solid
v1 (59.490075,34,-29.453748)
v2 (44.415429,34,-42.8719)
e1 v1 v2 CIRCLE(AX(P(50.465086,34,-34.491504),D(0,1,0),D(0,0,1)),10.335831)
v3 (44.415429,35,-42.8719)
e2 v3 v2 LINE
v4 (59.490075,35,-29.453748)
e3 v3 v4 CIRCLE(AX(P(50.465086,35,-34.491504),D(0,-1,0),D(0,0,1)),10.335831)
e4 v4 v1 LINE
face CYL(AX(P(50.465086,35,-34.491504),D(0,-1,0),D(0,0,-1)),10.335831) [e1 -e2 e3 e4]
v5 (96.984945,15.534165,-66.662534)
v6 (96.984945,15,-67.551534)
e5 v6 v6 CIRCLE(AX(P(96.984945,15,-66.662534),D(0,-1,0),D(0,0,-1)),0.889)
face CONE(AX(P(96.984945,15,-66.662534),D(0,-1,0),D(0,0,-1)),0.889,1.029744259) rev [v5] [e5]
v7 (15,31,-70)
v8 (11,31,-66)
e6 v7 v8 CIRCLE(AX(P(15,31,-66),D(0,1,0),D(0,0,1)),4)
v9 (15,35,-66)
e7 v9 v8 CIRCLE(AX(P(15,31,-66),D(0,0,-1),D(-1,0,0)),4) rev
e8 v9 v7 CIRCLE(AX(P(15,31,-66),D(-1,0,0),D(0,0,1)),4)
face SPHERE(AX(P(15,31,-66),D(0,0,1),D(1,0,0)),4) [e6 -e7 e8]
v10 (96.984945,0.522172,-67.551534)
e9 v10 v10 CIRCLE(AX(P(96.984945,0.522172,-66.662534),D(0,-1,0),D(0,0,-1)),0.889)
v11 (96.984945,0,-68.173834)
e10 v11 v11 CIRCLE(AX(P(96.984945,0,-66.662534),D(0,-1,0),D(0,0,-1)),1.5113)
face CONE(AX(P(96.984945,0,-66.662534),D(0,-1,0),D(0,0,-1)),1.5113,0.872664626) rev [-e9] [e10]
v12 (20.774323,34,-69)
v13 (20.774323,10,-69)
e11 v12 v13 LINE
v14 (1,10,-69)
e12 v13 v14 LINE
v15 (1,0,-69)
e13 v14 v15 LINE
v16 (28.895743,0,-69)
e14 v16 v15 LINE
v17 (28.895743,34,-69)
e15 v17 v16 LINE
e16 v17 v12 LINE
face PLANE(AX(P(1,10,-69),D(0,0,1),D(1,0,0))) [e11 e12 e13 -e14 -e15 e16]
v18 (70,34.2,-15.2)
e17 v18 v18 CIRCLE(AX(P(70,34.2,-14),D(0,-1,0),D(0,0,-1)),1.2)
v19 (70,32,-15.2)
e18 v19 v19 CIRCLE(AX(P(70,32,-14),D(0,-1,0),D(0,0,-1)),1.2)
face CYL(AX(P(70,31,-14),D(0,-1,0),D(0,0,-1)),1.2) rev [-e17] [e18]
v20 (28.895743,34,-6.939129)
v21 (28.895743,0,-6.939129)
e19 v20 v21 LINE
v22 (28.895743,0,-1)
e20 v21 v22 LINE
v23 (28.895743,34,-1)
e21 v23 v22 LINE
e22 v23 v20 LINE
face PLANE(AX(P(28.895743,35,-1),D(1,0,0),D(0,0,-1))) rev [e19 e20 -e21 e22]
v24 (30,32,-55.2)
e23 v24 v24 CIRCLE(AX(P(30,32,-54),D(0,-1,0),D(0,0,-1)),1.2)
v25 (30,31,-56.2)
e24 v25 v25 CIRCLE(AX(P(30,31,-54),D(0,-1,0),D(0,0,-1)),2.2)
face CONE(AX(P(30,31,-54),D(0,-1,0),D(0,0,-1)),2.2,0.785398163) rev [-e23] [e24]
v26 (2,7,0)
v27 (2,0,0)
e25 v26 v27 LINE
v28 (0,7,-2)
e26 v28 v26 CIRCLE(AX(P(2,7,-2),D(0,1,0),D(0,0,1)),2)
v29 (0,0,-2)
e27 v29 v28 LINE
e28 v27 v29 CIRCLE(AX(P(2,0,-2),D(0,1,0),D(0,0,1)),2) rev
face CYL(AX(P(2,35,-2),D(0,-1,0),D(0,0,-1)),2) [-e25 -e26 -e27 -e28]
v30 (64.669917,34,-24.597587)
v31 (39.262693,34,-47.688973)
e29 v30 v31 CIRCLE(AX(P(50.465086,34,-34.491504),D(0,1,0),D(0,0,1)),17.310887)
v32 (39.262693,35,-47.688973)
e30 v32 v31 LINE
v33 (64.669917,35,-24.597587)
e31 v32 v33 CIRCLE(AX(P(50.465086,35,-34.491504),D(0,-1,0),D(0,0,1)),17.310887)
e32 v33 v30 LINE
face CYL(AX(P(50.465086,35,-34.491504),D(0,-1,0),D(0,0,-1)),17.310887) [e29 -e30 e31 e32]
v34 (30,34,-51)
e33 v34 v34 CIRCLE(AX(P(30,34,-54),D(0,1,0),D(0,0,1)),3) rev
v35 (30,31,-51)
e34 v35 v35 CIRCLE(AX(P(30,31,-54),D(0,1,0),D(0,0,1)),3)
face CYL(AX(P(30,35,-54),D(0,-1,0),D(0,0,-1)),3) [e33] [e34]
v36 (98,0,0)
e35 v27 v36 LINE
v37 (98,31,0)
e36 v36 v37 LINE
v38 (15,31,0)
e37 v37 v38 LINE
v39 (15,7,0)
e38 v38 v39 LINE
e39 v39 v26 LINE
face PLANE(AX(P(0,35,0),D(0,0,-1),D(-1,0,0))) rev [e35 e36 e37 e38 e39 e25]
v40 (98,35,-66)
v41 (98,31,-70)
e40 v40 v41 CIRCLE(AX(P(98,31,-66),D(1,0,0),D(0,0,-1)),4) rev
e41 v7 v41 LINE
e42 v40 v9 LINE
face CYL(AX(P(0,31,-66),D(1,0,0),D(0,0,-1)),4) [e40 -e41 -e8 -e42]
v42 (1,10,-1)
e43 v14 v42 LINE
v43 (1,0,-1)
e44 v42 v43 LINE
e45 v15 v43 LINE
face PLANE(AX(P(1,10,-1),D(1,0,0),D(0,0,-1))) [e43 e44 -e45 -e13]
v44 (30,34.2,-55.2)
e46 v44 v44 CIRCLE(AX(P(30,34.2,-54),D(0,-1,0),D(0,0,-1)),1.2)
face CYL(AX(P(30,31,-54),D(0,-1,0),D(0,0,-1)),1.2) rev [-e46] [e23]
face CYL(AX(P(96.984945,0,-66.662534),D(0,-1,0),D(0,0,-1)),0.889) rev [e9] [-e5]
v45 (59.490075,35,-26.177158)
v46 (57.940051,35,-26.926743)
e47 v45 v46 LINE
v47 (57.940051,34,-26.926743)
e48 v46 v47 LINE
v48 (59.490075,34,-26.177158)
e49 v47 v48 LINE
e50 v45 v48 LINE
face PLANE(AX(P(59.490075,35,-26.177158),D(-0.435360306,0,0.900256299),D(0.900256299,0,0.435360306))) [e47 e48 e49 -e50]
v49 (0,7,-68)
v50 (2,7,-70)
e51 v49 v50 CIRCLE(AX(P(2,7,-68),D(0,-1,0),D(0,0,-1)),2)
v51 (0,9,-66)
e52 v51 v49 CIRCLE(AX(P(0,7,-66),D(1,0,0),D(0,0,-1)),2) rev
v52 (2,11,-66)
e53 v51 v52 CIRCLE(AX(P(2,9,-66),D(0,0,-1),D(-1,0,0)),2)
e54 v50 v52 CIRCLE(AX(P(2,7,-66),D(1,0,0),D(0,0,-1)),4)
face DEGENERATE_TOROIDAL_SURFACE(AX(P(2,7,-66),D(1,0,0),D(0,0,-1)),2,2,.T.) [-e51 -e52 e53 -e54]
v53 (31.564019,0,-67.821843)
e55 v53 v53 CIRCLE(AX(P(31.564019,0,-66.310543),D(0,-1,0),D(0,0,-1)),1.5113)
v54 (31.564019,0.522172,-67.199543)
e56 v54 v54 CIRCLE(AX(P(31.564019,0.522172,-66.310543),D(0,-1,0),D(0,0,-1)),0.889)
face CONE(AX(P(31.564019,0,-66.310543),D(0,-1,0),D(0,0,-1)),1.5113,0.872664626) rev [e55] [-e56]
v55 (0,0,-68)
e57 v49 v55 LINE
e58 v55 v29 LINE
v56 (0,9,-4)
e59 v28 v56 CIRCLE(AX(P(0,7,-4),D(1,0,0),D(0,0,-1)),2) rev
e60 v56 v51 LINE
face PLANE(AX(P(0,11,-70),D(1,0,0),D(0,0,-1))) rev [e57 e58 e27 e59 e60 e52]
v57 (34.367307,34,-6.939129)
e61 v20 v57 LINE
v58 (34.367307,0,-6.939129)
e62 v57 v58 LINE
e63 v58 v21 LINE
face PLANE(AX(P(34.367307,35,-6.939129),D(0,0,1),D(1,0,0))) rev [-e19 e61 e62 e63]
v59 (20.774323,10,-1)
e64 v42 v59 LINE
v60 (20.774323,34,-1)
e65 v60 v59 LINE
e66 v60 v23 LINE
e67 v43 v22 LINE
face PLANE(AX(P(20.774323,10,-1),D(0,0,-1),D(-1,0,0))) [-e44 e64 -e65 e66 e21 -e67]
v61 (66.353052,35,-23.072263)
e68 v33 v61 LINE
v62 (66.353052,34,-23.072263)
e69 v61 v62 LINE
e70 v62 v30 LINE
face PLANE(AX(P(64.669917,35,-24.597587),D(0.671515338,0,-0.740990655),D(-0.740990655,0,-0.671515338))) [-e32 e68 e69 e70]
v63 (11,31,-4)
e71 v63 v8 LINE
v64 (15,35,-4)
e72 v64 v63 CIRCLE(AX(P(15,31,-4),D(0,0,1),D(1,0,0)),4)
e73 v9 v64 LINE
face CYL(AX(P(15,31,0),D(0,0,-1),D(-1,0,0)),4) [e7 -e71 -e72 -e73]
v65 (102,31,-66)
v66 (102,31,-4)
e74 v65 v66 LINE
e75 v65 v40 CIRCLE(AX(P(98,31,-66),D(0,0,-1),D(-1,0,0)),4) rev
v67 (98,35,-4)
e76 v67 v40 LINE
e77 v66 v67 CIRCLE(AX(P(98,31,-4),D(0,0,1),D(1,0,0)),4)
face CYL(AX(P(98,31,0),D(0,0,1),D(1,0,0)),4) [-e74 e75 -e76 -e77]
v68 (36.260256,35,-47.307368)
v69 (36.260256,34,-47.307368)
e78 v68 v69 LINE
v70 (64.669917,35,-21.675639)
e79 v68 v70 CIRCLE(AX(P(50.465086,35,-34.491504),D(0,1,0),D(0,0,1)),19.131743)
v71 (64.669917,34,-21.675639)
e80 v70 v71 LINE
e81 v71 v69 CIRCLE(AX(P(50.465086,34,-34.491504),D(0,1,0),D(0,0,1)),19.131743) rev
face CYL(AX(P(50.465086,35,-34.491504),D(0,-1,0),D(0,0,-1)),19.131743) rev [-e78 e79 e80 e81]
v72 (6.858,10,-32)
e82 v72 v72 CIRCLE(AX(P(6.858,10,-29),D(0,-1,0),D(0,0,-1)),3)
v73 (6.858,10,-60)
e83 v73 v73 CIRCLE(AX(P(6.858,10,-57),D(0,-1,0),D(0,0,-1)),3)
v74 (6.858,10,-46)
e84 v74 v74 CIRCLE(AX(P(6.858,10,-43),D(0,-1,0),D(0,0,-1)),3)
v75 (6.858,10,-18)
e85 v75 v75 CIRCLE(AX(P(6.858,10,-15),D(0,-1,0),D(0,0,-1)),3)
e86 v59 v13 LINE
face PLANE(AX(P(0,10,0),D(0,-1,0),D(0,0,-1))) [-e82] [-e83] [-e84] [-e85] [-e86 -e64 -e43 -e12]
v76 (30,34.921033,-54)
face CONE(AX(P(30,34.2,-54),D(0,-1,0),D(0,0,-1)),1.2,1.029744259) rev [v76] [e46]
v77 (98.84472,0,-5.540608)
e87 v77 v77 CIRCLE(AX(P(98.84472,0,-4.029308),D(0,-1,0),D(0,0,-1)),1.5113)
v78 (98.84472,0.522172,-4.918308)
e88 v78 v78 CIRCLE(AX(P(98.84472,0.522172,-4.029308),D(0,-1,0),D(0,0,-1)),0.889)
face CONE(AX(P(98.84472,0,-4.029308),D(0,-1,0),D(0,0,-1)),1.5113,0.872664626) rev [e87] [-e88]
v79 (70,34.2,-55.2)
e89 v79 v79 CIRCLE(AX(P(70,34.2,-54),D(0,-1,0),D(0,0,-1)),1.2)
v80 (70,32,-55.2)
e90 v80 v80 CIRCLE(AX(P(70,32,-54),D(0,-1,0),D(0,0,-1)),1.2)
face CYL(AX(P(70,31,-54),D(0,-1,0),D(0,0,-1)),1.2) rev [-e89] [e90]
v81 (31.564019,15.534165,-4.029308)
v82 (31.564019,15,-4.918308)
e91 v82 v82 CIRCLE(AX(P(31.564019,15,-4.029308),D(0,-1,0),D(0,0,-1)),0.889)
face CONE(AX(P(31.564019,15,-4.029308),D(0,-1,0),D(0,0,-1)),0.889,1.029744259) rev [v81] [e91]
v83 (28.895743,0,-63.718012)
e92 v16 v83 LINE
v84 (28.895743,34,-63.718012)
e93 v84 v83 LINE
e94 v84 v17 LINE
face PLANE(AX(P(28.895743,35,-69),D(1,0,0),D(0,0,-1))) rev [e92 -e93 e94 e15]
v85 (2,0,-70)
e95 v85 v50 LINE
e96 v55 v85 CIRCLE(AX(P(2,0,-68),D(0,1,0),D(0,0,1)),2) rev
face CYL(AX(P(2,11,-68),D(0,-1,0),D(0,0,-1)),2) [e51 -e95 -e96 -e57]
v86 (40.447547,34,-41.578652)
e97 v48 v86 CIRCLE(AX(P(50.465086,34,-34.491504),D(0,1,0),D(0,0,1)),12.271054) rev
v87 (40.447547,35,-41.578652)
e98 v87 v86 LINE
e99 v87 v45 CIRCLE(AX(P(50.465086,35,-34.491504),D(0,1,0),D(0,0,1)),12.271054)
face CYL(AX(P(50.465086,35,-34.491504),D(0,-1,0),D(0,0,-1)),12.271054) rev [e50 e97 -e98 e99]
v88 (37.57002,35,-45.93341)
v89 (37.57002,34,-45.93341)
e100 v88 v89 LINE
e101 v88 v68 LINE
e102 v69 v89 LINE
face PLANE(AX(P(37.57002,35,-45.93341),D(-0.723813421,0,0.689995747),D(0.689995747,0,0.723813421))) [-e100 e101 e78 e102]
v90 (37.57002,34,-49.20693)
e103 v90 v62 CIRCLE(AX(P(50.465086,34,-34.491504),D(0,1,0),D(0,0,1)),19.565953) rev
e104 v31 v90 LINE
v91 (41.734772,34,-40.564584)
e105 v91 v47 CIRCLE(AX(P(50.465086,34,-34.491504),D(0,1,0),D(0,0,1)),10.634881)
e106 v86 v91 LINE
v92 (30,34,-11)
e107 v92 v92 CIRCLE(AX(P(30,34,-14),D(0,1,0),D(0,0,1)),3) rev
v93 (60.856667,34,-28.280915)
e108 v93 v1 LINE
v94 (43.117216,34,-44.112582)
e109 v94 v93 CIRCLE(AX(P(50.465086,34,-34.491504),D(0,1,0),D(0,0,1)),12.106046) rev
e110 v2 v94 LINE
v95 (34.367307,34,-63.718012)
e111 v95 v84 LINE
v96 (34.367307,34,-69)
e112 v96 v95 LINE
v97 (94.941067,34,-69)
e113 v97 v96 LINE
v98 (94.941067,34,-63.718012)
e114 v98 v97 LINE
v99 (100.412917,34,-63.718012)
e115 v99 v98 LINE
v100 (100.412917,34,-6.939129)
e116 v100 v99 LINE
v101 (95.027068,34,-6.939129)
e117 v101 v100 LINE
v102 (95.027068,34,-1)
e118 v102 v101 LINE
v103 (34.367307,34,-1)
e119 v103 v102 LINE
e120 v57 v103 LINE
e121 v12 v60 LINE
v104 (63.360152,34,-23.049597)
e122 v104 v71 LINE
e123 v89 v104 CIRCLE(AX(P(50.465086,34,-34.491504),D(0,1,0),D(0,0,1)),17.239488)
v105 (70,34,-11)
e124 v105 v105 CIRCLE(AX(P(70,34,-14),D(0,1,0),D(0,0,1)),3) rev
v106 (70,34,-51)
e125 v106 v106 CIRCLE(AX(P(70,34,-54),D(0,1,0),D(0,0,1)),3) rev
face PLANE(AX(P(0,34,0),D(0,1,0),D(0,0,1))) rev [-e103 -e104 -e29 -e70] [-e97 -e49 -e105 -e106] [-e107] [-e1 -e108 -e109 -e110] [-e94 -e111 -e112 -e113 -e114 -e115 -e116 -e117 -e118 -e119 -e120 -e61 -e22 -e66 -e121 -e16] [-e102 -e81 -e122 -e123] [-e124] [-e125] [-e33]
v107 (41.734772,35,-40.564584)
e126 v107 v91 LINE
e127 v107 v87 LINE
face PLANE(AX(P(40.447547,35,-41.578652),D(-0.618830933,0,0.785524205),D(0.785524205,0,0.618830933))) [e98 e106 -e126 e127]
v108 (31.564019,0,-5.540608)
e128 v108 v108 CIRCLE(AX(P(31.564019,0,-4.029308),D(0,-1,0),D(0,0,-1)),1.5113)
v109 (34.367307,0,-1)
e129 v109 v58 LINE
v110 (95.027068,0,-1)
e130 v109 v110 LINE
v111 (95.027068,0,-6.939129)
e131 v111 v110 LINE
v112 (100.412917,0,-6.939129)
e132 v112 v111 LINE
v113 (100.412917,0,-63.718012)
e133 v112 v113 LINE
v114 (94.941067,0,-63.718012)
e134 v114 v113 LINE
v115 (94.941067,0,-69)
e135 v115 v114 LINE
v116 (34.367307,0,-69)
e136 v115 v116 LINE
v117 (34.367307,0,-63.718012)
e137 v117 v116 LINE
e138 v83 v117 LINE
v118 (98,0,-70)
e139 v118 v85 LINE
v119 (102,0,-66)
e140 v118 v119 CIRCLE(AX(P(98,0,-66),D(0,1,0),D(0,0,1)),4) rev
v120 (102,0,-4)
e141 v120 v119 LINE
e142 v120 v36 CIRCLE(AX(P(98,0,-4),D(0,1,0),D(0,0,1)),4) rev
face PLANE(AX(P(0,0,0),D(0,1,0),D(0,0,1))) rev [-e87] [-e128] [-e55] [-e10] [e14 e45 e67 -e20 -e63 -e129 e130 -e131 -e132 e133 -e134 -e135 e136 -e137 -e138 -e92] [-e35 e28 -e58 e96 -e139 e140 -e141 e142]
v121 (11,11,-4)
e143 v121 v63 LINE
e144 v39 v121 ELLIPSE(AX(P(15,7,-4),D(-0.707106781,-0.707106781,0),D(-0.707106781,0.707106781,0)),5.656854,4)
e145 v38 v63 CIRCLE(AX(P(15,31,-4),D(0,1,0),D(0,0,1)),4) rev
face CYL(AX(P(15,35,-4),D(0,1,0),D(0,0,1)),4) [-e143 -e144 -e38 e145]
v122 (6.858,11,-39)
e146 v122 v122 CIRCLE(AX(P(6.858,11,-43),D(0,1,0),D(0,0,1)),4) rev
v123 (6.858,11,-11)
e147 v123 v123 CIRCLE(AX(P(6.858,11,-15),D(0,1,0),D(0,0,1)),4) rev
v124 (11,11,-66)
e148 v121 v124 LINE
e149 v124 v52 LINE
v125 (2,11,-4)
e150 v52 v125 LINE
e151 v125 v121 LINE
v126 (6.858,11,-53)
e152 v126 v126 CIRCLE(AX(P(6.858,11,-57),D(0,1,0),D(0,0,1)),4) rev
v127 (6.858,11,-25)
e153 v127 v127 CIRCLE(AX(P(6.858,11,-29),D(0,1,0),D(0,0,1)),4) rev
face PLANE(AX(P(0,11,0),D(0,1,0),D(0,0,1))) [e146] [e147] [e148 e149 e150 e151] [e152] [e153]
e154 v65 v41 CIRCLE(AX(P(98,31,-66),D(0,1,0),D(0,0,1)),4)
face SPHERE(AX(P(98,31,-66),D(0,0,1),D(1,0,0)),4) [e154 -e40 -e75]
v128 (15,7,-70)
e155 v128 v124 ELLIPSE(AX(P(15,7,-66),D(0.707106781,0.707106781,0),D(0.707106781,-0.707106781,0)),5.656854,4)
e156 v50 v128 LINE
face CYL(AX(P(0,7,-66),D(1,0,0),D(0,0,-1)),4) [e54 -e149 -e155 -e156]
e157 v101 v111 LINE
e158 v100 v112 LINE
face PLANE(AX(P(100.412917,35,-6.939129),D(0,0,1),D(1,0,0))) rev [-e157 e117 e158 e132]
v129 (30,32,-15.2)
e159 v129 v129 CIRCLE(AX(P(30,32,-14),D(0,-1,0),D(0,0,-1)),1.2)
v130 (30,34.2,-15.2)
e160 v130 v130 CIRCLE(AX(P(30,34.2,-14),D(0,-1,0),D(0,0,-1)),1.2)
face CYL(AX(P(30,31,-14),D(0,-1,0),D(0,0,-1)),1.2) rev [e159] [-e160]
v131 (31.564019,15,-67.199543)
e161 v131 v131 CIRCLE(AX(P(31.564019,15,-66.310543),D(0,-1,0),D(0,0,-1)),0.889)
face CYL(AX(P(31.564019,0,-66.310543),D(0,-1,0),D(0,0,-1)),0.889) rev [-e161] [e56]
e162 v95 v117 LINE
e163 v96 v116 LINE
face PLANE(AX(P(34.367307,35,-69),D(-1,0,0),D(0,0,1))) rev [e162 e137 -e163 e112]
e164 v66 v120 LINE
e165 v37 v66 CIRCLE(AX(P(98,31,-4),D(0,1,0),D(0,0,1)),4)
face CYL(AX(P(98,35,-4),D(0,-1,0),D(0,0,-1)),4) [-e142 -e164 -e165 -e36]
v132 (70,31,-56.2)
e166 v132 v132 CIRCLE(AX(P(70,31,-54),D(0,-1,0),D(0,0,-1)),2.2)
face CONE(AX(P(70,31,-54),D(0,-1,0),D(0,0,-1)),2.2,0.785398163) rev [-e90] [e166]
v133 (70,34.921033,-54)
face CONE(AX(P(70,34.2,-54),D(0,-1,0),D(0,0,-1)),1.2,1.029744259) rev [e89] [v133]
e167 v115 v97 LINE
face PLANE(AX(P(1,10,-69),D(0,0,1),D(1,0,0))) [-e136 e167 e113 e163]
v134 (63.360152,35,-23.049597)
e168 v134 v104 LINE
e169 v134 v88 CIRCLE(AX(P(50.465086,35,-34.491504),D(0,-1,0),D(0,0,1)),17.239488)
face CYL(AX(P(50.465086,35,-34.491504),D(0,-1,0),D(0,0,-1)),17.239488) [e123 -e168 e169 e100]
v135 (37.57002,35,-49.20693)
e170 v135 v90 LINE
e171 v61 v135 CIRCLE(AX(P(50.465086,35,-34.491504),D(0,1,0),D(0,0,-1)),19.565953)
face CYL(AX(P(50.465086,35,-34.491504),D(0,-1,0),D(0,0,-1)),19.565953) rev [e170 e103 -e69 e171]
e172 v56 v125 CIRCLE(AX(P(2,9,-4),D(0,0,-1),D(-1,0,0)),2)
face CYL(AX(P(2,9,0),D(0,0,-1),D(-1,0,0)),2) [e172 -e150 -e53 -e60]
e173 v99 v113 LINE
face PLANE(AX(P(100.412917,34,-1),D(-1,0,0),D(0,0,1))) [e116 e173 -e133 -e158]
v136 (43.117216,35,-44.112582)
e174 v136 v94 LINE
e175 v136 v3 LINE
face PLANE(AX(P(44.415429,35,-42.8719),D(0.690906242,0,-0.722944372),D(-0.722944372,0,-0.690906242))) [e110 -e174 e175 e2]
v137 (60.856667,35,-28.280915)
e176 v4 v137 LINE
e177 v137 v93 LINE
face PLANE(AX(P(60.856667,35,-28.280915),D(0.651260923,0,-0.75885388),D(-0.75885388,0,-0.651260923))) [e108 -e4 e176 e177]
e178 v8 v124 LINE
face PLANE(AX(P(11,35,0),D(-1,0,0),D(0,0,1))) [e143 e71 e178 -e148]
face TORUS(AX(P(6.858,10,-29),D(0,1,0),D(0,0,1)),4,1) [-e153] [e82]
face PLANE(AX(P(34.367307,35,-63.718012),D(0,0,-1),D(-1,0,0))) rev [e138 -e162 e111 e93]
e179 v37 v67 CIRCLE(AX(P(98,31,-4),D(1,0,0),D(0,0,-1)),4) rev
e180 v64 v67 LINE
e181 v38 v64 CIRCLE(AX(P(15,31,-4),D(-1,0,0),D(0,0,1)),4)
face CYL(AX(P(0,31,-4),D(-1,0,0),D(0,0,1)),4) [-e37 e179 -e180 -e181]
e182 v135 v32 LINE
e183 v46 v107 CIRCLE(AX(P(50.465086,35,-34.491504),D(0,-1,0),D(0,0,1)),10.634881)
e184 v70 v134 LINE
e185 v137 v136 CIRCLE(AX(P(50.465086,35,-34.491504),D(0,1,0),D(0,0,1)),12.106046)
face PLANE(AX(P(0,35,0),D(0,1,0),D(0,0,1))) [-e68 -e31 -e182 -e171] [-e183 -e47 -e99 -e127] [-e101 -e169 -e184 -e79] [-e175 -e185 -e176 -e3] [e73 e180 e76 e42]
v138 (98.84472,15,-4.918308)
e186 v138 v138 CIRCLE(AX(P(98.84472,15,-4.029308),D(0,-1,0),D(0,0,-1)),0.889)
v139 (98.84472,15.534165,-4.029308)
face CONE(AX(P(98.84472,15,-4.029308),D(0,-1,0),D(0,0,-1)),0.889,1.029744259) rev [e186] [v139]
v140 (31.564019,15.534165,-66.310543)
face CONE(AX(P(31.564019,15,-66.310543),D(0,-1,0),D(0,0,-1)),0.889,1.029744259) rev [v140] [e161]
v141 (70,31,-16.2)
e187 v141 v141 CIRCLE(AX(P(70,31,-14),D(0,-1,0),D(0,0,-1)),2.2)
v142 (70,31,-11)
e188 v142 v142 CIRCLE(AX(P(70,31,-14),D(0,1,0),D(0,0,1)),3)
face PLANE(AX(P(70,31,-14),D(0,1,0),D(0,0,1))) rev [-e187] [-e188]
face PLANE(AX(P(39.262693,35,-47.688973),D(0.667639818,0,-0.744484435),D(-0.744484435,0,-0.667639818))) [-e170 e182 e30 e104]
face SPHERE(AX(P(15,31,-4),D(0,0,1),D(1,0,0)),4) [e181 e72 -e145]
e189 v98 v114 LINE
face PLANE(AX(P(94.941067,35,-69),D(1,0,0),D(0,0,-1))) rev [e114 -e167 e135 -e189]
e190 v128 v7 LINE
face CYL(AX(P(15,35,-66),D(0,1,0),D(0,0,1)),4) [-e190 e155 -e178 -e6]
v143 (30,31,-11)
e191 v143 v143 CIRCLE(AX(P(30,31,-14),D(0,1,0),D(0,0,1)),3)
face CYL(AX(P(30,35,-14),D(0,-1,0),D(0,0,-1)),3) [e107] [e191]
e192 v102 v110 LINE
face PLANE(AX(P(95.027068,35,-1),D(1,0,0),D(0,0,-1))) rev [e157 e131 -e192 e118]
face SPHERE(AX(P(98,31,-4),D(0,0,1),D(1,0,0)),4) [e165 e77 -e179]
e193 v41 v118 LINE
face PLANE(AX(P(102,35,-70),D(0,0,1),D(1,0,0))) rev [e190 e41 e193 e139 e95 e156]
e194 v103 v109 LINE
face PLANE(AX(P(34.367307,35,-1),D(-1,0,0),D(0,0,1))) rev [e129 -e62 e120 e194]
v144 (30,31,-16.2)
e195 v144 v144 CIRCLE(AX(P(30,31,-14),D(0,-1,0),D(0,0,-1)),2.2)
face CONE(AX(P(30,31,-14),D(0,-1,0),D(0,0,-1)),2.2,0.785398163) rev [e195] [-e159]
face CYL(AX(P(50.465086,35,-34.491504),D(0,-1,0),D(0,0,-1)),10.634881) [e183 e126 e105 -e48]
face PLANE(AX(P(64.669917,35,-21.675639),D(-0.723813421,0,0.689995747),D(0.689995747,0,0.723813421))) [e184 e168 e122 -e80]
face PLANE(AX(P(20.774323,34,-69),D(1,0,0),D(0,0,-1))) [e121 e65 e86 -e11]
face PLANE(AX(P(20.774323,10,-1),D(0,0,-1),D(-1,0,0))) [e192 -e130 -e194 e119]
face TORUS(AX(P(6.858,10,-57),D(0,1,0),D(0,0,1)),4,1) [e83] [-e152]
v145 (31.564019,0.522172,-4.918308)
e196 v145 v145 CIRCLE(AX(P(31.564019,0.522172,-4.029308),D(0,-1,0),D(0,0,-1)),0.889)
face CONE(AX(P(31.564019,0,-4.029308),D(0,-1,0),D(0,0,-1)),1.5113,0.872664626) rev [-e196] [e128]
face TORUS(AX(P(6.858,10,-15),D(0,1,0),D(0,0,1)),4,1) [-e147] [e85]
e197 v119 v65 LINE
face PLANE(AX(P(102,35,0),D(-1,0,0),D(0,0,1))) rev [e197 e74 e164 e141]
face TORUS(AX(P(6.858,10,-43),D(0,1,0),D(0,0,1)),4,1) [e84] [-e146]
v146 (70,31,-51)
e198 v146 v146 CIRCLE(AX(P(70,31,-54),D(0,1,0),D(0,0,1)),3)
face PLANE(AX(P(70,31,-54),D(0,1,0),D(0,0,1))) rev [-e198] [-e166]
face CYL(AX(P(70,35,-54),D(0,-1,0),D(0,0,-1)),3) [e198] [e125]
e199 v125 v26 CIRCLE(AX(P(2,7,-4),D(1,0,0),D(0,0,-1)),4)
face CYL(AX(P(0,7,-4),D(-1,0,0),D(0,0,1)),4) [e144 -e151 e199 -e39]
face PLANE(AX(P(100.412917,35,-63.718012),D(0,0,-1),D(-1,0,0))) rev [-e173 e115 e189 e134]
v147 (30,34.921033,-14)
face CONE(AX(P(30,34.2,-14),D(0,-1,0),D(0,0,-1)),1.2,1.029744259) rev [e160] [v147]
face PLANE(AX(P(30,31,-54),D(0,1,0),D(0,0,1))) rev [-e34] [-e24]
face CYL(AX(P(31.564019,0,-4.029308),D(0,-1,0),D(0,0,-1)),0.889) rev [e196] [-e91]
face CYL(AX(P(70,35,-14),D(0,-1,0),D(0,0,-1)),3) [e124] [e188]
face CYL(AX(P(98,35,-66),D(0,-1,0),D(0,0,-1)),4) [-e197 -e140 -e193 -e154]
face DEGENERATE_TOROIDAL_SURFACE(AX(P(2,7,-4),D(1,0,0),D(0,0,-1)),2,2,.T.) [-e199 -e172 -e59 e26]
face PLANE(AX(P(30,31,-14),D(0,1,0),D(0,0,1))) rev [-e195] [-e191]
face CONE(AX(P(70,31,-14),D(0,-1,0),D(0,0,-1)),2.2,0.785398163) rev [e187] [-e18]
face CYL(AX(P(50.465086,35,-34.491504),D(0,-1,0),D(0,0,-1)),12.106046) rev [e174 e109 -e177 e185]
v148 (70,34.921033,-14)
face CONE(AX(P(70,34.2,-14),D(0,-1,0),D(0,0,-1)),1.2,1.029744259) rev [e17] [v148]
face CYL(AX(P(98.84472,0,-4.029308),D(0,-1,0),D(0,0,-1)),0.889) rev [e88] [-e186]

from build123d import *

# Parameters (mm, degrees)
SKETCH1_W                                         = 102
SKETCH1_H                                         = 70
BOSS_EXTRUDE3_DEPTH                               = 35
SKETCH4_W                                         = 11
SKETCH4_H                                         = 70
CUT_EXTRUDE1_DEPTH                                = 129.565158577
SKETCH5_W                                         = 11
SKETCH5_H                                         = 70
BOSS_EXTRUDE4_DEPTH                               = 11
SKETCH6_W                                         = 19.77432328
SKETCH6_H                                         = 68
CUT_EXTRUDE2_DEPTH                                = 10
SKETCH7_W                                         = 79.638593358
SKETCH7_H                                         = 68
CUT_EXTRUDE3_DEPTH                                = 34
CUT_EXTRUDE4_DEPTH                                = 127.210142223
CUT_EXTRUDE4_DEPTH_BACK                           = 127.210142223
SKETCH8_R                                         = 3
BOSS_EXTRUDE6_REACH                               = 130.565
SKETCH9_W                                         = 5.385848538
SKETCH9_H                                         = 5.939128552
SKETCH9_W_2                                       = 5.471564249
SKETCH9_W_3                                       = 5.47184949
SKETCH9_H_2                                       = 5.281988132
BOSS_EXTRUDE7_REACH                               = 130.565
SKETCH10_R                                        = 3
SKETCH11_R                                        = 3
CUT_EXTRUDE5_DEPTH                                = 31
CSK_FOR_0_FLAT_HEAD_MACHINE_SCREW_100_D           = 1.778
CSK_FOR_0_FLAT_HEAD_MACHINE_SCREW_100_DEPTH       = 15
CSK_FOR_0_FLAT_HEAD_MACHINE_SCREW_100_CSINK_D     = 3.0226
CSK_FOR_0_FLAT_HEAD_MACHINE_SCREW_100_CSINK_ANGLE = 100
CSK_FOR_0_FLAT_HEAD_MACHINE_SCREW_100_TIP         = 0.53416509
CSK_FOR_M2_FLAT_HEAD_MACHINE_SCREW2_D             = 2.4
CSK_FOR_M2_FLAT_HEAD_MACHINE_SCREW2_DEPTH         = 3.2
CSK_FOR_M2_FLAT_HEAD_MACHINE_SCREW2_CSINK_D       = 4.4
CSK_FOR_M2_FLAT_HEAD_MACHINE_SCREW2_CSINK_ANGLE   = 90
CSK_FOR_M2_FLAT_HEAD_MACHINE_SCREW2_TIP           = 0.721032743
CUT_EXTRUDE6_DEPTH                                = 129.565158577
FILLET4_R                                         = 4
FILLET5_R                                         = 2
FILLET6_R                                         = 1
FILLET8_R                                         = 1


with BuildPart() as part:
    # Sketch1 → Boss-Extrude3 (new body)
    with BuildSketch(Plane(origin=(0, 0, 0), x_dir=(1, 0, 0), z_dir=(0, 1, 0))):
        with Locations((51, 35)):
            Rectangle(SKETCH1_W, SKETCH1_H)
    extrude(amount=BOSS_EXTRUDE3_DEPTH)

    # Sketch4 → Cut-Extrude1 (cut, through all)
    with BuildSketch(Plane(origin=(0, 0, 0), x_dir=(1, 0, 0), z_dir=(0, 1, 0))):
        with Locations((5.5, 35)):
            Rectangle(SKETCH4_W, SKETCH4_H)
    extrude(amount=CUT_EXTRUDE1_DEPTH, mode=Mode.SUBTRACT)

    # Sketch5 → Boss-Extrude4 (add)
    with BuildSketch(Plane(origin=(0, 0, 0), x_dir=(1, 0, 0), z_dir=(0, 1, 0))):
        with Locations((5.5, 35)):
            Rectangle(SKETCH5_W, SKETCH5_H)
    extrude(amount=BOSS_EXTRUDE4_DEPTH)

    # Sketch6 → Cut-Extrude2 (cut)
    with BuildSketch(Plane(origin=(0, 0, 0), x_dir=(1, 0, 0), z_dir=(0, 1, 0))):
        with Locations((10.88716164, 35)):
            Rectangle(SKETCH6_W, SKETCH6_H)
    extrude(amount=CUT_EXTRUDE2_DEPTH, mode=Mode.SUBTRACT)

    # Sketch7 → Cut-Extrude3 (cut)
    with BuildSketch(Plane(origin=(0, 0, 0), x_dir=(1, 0, 0), z_dir=(0, 1, 0))):
        with Locations((60.593619959, 35)):
            Rectangle(SKETCH7_W, SKETCH7_H)
    extrude(amount=CUT_EXTRUDE3_DEPTH, mode=Mode.SUBTRACT)

    # Sketch8 → Cut-Extrude4 (cut, two sides: drawn at the far end of the back side and taken through both)
    with BuildSketch(Plane(origin=(0, 10, 0), x_dir=(-1, 0, 0), z_dir=(0, -1, 0)).offset(-CUT_EXTRUDE4_DEPTH_BACK)):
        with Locations(Location((-6.858, 57, 0), (0, 0, 90))):
            Circle(SKETCH8_R)
        with Locations(Location((-6.858, 43, 0), (0, 0, 90))):
            Circle(SKETCH8_R)
        with Locations(Location((-6.858, 29, 0), (0, 0, 90))):
            Circle(SKETCH8_R)
        with Locations(Location((-6.858, 15, 0), (0, 0, 90))):
            Circle(SKETCH8_R)
    extrude(amount=CUT_EXTRUDE4_DEPTH + CUT_EXTRUDE4_DEPTH_BACK, mode=Mode.SUBTRACT)

    # Sketch9 → Boss-Extrude6 (add, up to next)
    with BuildSketch(Plane(origin=(0, 0, 0), x_dir=(1, 0, 0), z_dir=(0, 1, 0)), mode=Mode.PRIVATE) as boss_extrude6_sk1:
        with Locations((97.719992369, 3.969564276)):
            Rectangle(SKETCH9_W, SKETCH9_H)
    boss_extrude6_tool1 = extrude(boss_extrude6_sk1.sketch, amount=BOSS_EXTRUDE6_REACH, mode=Mode.PRIVATE) - part.part
    # Sketch9 → Boss-Extrude6 (add, up to next)
    with BuildSketch(Plane(origin=(0, 0, 0), x_dir=(1, 0, 0), z_dir=(0, 1, 0)), mode=Mode.PRIVATE) as boss_extrude6_sk2:
        with Locations((31.631525182, 3.969564276)):
            Rectangle(SKETCH9_W_2, SKETCH9_H)
    boss_extrude6_tool2 = extrude(boss_extrude6_sk2.sketch, amount=BOSS_EXTRUDE6_REACH, mode=Mode.PRIVATE) - part.part
    # Sketch9 → Boss-Extrude6 (add, up to next)
    with BuildSketch(Plane(origin=(0, 0, 0), x_dir=(1, 0, 0), z_dir=(0, 1, 0)), mode=Mode.PRIVATE) as boss_extrude6_sk3:
        with Locations((97.676991893, 66.359005934)):
            Rectangle(SKETCH9_W_3, SKETCH9_H_2)
    boss_extrude6_tool3 = extrude(boss_extrude6_sk3.sketch, amount=BOSS_EXTRUDE6_REACH, mode=Mode.PRIVATE) - part.part
    # Sketch9 → Boss-Extrude6 (add, up to next)
    with BuildSketch(Plane(origin=(0, 0, 0), x_dir=(1, 0, 0), z_dir=(0, 1, 0)), mode=Mode.PRIVATE) as boss_extrude6_sk4:
        with Locations((31.631525182, 66.359005934)):
            Rectangle(SKETCH9_W_2, SKETCH9_H_2)
    boss_extrude6_tool4 = extrude(boss_extrude6_sk4.sketch, amount=BOSS_EXTRUDE6_REACH, mode=Mode.PRIVATE) - part.part
    add(boss_extrude6_tool1.solids().sort_by_distance((97.719992, 0, -3.969564))[0])
    add(boss_extrude6_tool2.solids().sort_by_distance((31.631525, 0, -3.969564))[0])
    add(boss_extrude6_tool3.solids().sort_by_distance((97.676992, 0, -66.359006))[0])
    add(boss_extrude6_tool4.solids().sort_by_distance((31.631525, 0, -66.359006))[0])

    # Sketch10 → Boss-Extrude7 (add, up to next)
    with BuildSketch(Plane(origin=(0, 0, 0), x_dir=(1, 0, 0), z_dir=(0, 1, 0)), mode=Mode.PRIVATE) as boss_extrude7_sk1:
        with Locations(Location((70, 54, 0), (0, 0, 270))):
            Circle(SKETCH10_R)
    boss_extrude7_tool1 = extrude(boss_extrude7_sk1.sketch, amount=BOSS_EXTRUDE7_REACH, mode=Mode.PRIVATE) - part.part
    # Sketch10 → Boss-Extrude7 (add, up to next)
    with BuildSketch(Plane(origin=(0, 0, 0), x_dir=(1, 0, 0), z_dir=(0, 1, 0)), mode=Mode.PRIVATE) as boss_extrude7_sk2:
        with Locations(Location((30, 54, 0), (0, 0, 270))):
            Circle(SKETCH10_R)
    boss_extrude7_tool2 = extrude(boss_extrude7_sk2.sketch, amount=BOSS_EXTRUDE7_REACH, mode=Mode.PRIVATE) - part.part
    # Sketch10 → Boss-Extrude7 (add, up to next)
    with BuildSketch(Plane(origin=(0, 0, 0), x_dir=(1, 0, 0), z_dir=(0, 1, 0)), mode=Mode.PRIVATE) as boss_extrude7_sk3:
        with Locations(Location((30, 14, 0), (0, 0, 270))):
            Circle(SKETCH10_R)
    boss_extrude7_tool3 = extrude(boss_extrude7_sk3.sketch, amount=BOSS_EXTRUDE7_REACH, mode=Mode.PRIVATE) - part.part
    # Sketch10 → Boss-Extrude7 (add, up to next)
    with BuildSketch(Plane(origin=(0, 0, 0), x_dir=(1, 0, 0), z_dir=(0, 1, 0)), mode=Mode.PRIVATE) as boss_extrude7_sk4:
        with Locations(Location((70, 14, 0), (0, 0, 270))):
            Circle(SKETCH10_R)
    boss_extrude7_tool4 = extrude(boss_extrude7_sk4.sketch, amount=BOSS_EXTRUDE7_REACH, mode=Mode.PRIVATE) - part.part
    add(boss_extrude7_tool1.solids().sort_by_distance((70, 0, -54))[0])
    add(boss_extrude7_tool2.solids().sort_by_distance((30, 0, -54))[0])
    add(boss_extrude7_tool3.solids().sort_by_distance((30, 0, -14))[0])
    add(boss_extrude7_tool4.solids().sort_by_distance((70, 0, -14))[0])

    # Sketch11 → Cut-Extrude5 (cut)
    with BuildSketch(Plane(origin=(0, 0, 0), x_dir=(1, 0, 0), z_dir=(0, 1, 0))):
        with Locations(Location((70, 14, 0), (0, 0, 270))):
            Circle(SKETCH11_R)
        with Locations(Location((70, 54, 0), (0, 0, 270))):
            Circle(SKETCH11_R)
        with Locations(Location((30, 54, 0), (0, 0, 270))):
            Circle(SKETCH11_R)
        with Locations(Location((30, 14, 0), (0, 0, 270))):
            Circle(SKETCH11_R)
    extrude(amount=CUT_EXTRUDE5_DEPTH, mode=Mode.SUBTRACT)

    # CSK for #0 Flat Head Machine Screw (100)1
    with Locations(Plane(origin=(0, 0, 0), x_dir=(-1, 0, 0), z_dir=(0, -1, 0))):
        with Locations((-98.844719926, 4.029307588), (-96.984944601, 66.662533555), (-31.564019442, 4.029307588), (-31.564019442, 66.310543226)):
            CounterSinkHole(CSK_FOR_0_FLAT_HEAD_MACHINE_SCREW_100_D / 2, CSK_FOR_0_FLAT_HEAD_MACHINE_SCREW_100_CSINK_D / 2, depth=CSK_FOR_0_FLAT_HEAD_MACHINE_SCREW_100_DEPTH, counter_sink_angle=CSK_FOR_0_FLAT_HEAD_MACHINE_SCREW_100_CSINK_ANGLE)
            with Locations((0, 0, -(CSK_FOR_0_FLAT_HEAD_MACHINE_SCREW_100_DEPTH + CSK_FOR_0_FLAT_HEAD_MACHINE_SCREW_100_TIP / 2))):  # 118° drill point
                Cone(0, CSK_FOR_0_FLAT_HEAD_MACHINE_SCREW_100_D / 2, CSK_FOR_0_FLAT_HEAD_MACHINE_SCREW_100_TIP, mode=Mode.SUBTRACT)

    # CSK for M2 Flat Head Machine Screw2
    with Locations(Plane(origin=(0, 31, 0), x_dir=(-1, 0, 0), z_dir=(0, -1, 0))):
        with Locations((-30, 14), (-30, 54), (-70, 54), (-70, 14)):
            CounterSinkHole(CSK_FOR_M2_FLAT_HEAD_MACHINE_SCREW2_D / 2, CSK_FOR_M2_FLAT_HEAD_MACHINE_SCREW2_CSINK_D / 2, depth=CSK_FOR_M2_FLAT_HEAD_MACHINE_SCREW2_DEPTH, counter_sink_angle=CSK_FOR_M2_FLAT_HEAD_MACHINE_SCREW2_CSINK_ANGLE)
            with Locations((0, 0, -(CSK_FOR_M2_FLAT_HEAD_MACHINE_SCREW2_DEPTH + CSK_FOR_M2_FLAT_HEAD_MACHINE_SCREW2_TIP / 2))):  # 118° drill point
                Cone(0, CSK_FOR_M2_FLAT_HEAD_MACHINE_SCREW2_D / 2, CSK_FOR_M2_FLAT_HEAD_MACHINE_SCREW2_TIP, mode=Mode.SUBTRACT)

    # Sketch16 → Cut-Extrude6 (cut, through all)
    with BuildSketch(Plane(origin=(0, 0, 0), x_dir=(1, 0, 0), z_dir=(0, 1, 0))):
        with BuildLine():
            Line((64.669916911, 24.597586994), (66.353051792, 23.072262917))
            ThreePointArc((66.353051792, 23.072262917), (63.617826431, 48.977080465), (37.5700204, 49.20693025))
            Line((37.5700204, 49.20693025), (39.262693262, 47.688972655))
            ThreePointArc((39.262693262, 47.688972655), (62.107967488, 47.30205083), (64.669916911, 24.597586994))
        make_face()
        with BuildLine():
            Line((64.669916911, 21.675638975), (63.360152355, 23.049596958))
            ThreePointArc((63.360152355, 23.049596958), (39.023179634, 21.596437723), (37.5700204, 45.933410444))
            Line((37.5700204, 45.933410444), (36.260255844, 47.307368427))
            ThreePointArc((36.260255844, 47.307368427), (37.649221651, 20.286673167), (64.669916911, 21.675638975))
        make_face()
        with BuildLine():
            Line((60.856667026, 28.280915432), (59.490074673, 29.453747543))
            ThreePointArc((59.490074673, 29.453747543), (57.337120661, 42.211901724), (44.415429176, 42.871900385))
            Line((44.415429176, 42.871900385), (43.117215584, 44.112582115))
            ThreePointArc((43.117215584, 44.112582115), (58.525884099, 43.523662641), (60.856667026, 28.280915432))
        make_face()
        with BuildLine():
            Line((40.447547123, 41.578651509), (41.734771762, 40.564584189))
            ThreePointArc((41.734771762, 40.564584189), (43.617338385, 26.354609494), (57.94005115, 26.926743193))
            Line((57.94005115, 26.926743193), (59.490074673, 26.177158084))
            ThreePointArc((59.490074673, 26.177158084), (42.74836497, 24.950488688), (40.447547123, 41.578651509))
        make_face()
    extrude(amount=CUT_EXTRUDE6_DEPTH, mode=Mode.SUBTRACT)

    # Fillet4
    fillet4_edges = [part.edges().sort_by_distance(p)[0] for p in [
        (102, 35, -35),
        (56.5, 35, 0),
        (56.5, 35, -70),
        (11, 23, 0),
        (11, 23, -70),
        (11, 35, -35),
        (5.5, 11, 0),
        (5.5, 11, -70),
        (102, 17.5, -70),
        (102, 17.5, 0),
    ]]
    fillet(fillet4_edges, radius=FILLET4_R)

    # Fillet5
    fillet5_edges = [part.edges().sort_by_distance(p)[0] for p in [
        (0, 11, -35),
        (0, 3.5, 0),
        (0, 3.5, -70),
        (0, 9.828427125, -68.828427125),
        (0, 9.828427125, -1.171572875),
    ]]
    fillet(fillet5_edges, radius=FILLET5_R)

    # Fillet6
    fillet6_edges = [part.edges().sort_by_distance(p)[0] for p in [
        (6.858, 11, -12),
    ]]
    fillet(fillet6_edges, radius=FILLET6_R - 0.0001)  # a hair under: the kernel refuses the full size

    # Fillet8
    fillet8_edges = [part.edges().sort_by_distance(p)[0] for p in [
        (6.858, 11, -54),
        (6.858, 11, -40),
        (6.858, 11, -26),
    ]]
    fillet(fillet8_edges, radius=FILLET8_R - 0.0001)  # a hair under: the kernel refuses the full size


solid = part.part
